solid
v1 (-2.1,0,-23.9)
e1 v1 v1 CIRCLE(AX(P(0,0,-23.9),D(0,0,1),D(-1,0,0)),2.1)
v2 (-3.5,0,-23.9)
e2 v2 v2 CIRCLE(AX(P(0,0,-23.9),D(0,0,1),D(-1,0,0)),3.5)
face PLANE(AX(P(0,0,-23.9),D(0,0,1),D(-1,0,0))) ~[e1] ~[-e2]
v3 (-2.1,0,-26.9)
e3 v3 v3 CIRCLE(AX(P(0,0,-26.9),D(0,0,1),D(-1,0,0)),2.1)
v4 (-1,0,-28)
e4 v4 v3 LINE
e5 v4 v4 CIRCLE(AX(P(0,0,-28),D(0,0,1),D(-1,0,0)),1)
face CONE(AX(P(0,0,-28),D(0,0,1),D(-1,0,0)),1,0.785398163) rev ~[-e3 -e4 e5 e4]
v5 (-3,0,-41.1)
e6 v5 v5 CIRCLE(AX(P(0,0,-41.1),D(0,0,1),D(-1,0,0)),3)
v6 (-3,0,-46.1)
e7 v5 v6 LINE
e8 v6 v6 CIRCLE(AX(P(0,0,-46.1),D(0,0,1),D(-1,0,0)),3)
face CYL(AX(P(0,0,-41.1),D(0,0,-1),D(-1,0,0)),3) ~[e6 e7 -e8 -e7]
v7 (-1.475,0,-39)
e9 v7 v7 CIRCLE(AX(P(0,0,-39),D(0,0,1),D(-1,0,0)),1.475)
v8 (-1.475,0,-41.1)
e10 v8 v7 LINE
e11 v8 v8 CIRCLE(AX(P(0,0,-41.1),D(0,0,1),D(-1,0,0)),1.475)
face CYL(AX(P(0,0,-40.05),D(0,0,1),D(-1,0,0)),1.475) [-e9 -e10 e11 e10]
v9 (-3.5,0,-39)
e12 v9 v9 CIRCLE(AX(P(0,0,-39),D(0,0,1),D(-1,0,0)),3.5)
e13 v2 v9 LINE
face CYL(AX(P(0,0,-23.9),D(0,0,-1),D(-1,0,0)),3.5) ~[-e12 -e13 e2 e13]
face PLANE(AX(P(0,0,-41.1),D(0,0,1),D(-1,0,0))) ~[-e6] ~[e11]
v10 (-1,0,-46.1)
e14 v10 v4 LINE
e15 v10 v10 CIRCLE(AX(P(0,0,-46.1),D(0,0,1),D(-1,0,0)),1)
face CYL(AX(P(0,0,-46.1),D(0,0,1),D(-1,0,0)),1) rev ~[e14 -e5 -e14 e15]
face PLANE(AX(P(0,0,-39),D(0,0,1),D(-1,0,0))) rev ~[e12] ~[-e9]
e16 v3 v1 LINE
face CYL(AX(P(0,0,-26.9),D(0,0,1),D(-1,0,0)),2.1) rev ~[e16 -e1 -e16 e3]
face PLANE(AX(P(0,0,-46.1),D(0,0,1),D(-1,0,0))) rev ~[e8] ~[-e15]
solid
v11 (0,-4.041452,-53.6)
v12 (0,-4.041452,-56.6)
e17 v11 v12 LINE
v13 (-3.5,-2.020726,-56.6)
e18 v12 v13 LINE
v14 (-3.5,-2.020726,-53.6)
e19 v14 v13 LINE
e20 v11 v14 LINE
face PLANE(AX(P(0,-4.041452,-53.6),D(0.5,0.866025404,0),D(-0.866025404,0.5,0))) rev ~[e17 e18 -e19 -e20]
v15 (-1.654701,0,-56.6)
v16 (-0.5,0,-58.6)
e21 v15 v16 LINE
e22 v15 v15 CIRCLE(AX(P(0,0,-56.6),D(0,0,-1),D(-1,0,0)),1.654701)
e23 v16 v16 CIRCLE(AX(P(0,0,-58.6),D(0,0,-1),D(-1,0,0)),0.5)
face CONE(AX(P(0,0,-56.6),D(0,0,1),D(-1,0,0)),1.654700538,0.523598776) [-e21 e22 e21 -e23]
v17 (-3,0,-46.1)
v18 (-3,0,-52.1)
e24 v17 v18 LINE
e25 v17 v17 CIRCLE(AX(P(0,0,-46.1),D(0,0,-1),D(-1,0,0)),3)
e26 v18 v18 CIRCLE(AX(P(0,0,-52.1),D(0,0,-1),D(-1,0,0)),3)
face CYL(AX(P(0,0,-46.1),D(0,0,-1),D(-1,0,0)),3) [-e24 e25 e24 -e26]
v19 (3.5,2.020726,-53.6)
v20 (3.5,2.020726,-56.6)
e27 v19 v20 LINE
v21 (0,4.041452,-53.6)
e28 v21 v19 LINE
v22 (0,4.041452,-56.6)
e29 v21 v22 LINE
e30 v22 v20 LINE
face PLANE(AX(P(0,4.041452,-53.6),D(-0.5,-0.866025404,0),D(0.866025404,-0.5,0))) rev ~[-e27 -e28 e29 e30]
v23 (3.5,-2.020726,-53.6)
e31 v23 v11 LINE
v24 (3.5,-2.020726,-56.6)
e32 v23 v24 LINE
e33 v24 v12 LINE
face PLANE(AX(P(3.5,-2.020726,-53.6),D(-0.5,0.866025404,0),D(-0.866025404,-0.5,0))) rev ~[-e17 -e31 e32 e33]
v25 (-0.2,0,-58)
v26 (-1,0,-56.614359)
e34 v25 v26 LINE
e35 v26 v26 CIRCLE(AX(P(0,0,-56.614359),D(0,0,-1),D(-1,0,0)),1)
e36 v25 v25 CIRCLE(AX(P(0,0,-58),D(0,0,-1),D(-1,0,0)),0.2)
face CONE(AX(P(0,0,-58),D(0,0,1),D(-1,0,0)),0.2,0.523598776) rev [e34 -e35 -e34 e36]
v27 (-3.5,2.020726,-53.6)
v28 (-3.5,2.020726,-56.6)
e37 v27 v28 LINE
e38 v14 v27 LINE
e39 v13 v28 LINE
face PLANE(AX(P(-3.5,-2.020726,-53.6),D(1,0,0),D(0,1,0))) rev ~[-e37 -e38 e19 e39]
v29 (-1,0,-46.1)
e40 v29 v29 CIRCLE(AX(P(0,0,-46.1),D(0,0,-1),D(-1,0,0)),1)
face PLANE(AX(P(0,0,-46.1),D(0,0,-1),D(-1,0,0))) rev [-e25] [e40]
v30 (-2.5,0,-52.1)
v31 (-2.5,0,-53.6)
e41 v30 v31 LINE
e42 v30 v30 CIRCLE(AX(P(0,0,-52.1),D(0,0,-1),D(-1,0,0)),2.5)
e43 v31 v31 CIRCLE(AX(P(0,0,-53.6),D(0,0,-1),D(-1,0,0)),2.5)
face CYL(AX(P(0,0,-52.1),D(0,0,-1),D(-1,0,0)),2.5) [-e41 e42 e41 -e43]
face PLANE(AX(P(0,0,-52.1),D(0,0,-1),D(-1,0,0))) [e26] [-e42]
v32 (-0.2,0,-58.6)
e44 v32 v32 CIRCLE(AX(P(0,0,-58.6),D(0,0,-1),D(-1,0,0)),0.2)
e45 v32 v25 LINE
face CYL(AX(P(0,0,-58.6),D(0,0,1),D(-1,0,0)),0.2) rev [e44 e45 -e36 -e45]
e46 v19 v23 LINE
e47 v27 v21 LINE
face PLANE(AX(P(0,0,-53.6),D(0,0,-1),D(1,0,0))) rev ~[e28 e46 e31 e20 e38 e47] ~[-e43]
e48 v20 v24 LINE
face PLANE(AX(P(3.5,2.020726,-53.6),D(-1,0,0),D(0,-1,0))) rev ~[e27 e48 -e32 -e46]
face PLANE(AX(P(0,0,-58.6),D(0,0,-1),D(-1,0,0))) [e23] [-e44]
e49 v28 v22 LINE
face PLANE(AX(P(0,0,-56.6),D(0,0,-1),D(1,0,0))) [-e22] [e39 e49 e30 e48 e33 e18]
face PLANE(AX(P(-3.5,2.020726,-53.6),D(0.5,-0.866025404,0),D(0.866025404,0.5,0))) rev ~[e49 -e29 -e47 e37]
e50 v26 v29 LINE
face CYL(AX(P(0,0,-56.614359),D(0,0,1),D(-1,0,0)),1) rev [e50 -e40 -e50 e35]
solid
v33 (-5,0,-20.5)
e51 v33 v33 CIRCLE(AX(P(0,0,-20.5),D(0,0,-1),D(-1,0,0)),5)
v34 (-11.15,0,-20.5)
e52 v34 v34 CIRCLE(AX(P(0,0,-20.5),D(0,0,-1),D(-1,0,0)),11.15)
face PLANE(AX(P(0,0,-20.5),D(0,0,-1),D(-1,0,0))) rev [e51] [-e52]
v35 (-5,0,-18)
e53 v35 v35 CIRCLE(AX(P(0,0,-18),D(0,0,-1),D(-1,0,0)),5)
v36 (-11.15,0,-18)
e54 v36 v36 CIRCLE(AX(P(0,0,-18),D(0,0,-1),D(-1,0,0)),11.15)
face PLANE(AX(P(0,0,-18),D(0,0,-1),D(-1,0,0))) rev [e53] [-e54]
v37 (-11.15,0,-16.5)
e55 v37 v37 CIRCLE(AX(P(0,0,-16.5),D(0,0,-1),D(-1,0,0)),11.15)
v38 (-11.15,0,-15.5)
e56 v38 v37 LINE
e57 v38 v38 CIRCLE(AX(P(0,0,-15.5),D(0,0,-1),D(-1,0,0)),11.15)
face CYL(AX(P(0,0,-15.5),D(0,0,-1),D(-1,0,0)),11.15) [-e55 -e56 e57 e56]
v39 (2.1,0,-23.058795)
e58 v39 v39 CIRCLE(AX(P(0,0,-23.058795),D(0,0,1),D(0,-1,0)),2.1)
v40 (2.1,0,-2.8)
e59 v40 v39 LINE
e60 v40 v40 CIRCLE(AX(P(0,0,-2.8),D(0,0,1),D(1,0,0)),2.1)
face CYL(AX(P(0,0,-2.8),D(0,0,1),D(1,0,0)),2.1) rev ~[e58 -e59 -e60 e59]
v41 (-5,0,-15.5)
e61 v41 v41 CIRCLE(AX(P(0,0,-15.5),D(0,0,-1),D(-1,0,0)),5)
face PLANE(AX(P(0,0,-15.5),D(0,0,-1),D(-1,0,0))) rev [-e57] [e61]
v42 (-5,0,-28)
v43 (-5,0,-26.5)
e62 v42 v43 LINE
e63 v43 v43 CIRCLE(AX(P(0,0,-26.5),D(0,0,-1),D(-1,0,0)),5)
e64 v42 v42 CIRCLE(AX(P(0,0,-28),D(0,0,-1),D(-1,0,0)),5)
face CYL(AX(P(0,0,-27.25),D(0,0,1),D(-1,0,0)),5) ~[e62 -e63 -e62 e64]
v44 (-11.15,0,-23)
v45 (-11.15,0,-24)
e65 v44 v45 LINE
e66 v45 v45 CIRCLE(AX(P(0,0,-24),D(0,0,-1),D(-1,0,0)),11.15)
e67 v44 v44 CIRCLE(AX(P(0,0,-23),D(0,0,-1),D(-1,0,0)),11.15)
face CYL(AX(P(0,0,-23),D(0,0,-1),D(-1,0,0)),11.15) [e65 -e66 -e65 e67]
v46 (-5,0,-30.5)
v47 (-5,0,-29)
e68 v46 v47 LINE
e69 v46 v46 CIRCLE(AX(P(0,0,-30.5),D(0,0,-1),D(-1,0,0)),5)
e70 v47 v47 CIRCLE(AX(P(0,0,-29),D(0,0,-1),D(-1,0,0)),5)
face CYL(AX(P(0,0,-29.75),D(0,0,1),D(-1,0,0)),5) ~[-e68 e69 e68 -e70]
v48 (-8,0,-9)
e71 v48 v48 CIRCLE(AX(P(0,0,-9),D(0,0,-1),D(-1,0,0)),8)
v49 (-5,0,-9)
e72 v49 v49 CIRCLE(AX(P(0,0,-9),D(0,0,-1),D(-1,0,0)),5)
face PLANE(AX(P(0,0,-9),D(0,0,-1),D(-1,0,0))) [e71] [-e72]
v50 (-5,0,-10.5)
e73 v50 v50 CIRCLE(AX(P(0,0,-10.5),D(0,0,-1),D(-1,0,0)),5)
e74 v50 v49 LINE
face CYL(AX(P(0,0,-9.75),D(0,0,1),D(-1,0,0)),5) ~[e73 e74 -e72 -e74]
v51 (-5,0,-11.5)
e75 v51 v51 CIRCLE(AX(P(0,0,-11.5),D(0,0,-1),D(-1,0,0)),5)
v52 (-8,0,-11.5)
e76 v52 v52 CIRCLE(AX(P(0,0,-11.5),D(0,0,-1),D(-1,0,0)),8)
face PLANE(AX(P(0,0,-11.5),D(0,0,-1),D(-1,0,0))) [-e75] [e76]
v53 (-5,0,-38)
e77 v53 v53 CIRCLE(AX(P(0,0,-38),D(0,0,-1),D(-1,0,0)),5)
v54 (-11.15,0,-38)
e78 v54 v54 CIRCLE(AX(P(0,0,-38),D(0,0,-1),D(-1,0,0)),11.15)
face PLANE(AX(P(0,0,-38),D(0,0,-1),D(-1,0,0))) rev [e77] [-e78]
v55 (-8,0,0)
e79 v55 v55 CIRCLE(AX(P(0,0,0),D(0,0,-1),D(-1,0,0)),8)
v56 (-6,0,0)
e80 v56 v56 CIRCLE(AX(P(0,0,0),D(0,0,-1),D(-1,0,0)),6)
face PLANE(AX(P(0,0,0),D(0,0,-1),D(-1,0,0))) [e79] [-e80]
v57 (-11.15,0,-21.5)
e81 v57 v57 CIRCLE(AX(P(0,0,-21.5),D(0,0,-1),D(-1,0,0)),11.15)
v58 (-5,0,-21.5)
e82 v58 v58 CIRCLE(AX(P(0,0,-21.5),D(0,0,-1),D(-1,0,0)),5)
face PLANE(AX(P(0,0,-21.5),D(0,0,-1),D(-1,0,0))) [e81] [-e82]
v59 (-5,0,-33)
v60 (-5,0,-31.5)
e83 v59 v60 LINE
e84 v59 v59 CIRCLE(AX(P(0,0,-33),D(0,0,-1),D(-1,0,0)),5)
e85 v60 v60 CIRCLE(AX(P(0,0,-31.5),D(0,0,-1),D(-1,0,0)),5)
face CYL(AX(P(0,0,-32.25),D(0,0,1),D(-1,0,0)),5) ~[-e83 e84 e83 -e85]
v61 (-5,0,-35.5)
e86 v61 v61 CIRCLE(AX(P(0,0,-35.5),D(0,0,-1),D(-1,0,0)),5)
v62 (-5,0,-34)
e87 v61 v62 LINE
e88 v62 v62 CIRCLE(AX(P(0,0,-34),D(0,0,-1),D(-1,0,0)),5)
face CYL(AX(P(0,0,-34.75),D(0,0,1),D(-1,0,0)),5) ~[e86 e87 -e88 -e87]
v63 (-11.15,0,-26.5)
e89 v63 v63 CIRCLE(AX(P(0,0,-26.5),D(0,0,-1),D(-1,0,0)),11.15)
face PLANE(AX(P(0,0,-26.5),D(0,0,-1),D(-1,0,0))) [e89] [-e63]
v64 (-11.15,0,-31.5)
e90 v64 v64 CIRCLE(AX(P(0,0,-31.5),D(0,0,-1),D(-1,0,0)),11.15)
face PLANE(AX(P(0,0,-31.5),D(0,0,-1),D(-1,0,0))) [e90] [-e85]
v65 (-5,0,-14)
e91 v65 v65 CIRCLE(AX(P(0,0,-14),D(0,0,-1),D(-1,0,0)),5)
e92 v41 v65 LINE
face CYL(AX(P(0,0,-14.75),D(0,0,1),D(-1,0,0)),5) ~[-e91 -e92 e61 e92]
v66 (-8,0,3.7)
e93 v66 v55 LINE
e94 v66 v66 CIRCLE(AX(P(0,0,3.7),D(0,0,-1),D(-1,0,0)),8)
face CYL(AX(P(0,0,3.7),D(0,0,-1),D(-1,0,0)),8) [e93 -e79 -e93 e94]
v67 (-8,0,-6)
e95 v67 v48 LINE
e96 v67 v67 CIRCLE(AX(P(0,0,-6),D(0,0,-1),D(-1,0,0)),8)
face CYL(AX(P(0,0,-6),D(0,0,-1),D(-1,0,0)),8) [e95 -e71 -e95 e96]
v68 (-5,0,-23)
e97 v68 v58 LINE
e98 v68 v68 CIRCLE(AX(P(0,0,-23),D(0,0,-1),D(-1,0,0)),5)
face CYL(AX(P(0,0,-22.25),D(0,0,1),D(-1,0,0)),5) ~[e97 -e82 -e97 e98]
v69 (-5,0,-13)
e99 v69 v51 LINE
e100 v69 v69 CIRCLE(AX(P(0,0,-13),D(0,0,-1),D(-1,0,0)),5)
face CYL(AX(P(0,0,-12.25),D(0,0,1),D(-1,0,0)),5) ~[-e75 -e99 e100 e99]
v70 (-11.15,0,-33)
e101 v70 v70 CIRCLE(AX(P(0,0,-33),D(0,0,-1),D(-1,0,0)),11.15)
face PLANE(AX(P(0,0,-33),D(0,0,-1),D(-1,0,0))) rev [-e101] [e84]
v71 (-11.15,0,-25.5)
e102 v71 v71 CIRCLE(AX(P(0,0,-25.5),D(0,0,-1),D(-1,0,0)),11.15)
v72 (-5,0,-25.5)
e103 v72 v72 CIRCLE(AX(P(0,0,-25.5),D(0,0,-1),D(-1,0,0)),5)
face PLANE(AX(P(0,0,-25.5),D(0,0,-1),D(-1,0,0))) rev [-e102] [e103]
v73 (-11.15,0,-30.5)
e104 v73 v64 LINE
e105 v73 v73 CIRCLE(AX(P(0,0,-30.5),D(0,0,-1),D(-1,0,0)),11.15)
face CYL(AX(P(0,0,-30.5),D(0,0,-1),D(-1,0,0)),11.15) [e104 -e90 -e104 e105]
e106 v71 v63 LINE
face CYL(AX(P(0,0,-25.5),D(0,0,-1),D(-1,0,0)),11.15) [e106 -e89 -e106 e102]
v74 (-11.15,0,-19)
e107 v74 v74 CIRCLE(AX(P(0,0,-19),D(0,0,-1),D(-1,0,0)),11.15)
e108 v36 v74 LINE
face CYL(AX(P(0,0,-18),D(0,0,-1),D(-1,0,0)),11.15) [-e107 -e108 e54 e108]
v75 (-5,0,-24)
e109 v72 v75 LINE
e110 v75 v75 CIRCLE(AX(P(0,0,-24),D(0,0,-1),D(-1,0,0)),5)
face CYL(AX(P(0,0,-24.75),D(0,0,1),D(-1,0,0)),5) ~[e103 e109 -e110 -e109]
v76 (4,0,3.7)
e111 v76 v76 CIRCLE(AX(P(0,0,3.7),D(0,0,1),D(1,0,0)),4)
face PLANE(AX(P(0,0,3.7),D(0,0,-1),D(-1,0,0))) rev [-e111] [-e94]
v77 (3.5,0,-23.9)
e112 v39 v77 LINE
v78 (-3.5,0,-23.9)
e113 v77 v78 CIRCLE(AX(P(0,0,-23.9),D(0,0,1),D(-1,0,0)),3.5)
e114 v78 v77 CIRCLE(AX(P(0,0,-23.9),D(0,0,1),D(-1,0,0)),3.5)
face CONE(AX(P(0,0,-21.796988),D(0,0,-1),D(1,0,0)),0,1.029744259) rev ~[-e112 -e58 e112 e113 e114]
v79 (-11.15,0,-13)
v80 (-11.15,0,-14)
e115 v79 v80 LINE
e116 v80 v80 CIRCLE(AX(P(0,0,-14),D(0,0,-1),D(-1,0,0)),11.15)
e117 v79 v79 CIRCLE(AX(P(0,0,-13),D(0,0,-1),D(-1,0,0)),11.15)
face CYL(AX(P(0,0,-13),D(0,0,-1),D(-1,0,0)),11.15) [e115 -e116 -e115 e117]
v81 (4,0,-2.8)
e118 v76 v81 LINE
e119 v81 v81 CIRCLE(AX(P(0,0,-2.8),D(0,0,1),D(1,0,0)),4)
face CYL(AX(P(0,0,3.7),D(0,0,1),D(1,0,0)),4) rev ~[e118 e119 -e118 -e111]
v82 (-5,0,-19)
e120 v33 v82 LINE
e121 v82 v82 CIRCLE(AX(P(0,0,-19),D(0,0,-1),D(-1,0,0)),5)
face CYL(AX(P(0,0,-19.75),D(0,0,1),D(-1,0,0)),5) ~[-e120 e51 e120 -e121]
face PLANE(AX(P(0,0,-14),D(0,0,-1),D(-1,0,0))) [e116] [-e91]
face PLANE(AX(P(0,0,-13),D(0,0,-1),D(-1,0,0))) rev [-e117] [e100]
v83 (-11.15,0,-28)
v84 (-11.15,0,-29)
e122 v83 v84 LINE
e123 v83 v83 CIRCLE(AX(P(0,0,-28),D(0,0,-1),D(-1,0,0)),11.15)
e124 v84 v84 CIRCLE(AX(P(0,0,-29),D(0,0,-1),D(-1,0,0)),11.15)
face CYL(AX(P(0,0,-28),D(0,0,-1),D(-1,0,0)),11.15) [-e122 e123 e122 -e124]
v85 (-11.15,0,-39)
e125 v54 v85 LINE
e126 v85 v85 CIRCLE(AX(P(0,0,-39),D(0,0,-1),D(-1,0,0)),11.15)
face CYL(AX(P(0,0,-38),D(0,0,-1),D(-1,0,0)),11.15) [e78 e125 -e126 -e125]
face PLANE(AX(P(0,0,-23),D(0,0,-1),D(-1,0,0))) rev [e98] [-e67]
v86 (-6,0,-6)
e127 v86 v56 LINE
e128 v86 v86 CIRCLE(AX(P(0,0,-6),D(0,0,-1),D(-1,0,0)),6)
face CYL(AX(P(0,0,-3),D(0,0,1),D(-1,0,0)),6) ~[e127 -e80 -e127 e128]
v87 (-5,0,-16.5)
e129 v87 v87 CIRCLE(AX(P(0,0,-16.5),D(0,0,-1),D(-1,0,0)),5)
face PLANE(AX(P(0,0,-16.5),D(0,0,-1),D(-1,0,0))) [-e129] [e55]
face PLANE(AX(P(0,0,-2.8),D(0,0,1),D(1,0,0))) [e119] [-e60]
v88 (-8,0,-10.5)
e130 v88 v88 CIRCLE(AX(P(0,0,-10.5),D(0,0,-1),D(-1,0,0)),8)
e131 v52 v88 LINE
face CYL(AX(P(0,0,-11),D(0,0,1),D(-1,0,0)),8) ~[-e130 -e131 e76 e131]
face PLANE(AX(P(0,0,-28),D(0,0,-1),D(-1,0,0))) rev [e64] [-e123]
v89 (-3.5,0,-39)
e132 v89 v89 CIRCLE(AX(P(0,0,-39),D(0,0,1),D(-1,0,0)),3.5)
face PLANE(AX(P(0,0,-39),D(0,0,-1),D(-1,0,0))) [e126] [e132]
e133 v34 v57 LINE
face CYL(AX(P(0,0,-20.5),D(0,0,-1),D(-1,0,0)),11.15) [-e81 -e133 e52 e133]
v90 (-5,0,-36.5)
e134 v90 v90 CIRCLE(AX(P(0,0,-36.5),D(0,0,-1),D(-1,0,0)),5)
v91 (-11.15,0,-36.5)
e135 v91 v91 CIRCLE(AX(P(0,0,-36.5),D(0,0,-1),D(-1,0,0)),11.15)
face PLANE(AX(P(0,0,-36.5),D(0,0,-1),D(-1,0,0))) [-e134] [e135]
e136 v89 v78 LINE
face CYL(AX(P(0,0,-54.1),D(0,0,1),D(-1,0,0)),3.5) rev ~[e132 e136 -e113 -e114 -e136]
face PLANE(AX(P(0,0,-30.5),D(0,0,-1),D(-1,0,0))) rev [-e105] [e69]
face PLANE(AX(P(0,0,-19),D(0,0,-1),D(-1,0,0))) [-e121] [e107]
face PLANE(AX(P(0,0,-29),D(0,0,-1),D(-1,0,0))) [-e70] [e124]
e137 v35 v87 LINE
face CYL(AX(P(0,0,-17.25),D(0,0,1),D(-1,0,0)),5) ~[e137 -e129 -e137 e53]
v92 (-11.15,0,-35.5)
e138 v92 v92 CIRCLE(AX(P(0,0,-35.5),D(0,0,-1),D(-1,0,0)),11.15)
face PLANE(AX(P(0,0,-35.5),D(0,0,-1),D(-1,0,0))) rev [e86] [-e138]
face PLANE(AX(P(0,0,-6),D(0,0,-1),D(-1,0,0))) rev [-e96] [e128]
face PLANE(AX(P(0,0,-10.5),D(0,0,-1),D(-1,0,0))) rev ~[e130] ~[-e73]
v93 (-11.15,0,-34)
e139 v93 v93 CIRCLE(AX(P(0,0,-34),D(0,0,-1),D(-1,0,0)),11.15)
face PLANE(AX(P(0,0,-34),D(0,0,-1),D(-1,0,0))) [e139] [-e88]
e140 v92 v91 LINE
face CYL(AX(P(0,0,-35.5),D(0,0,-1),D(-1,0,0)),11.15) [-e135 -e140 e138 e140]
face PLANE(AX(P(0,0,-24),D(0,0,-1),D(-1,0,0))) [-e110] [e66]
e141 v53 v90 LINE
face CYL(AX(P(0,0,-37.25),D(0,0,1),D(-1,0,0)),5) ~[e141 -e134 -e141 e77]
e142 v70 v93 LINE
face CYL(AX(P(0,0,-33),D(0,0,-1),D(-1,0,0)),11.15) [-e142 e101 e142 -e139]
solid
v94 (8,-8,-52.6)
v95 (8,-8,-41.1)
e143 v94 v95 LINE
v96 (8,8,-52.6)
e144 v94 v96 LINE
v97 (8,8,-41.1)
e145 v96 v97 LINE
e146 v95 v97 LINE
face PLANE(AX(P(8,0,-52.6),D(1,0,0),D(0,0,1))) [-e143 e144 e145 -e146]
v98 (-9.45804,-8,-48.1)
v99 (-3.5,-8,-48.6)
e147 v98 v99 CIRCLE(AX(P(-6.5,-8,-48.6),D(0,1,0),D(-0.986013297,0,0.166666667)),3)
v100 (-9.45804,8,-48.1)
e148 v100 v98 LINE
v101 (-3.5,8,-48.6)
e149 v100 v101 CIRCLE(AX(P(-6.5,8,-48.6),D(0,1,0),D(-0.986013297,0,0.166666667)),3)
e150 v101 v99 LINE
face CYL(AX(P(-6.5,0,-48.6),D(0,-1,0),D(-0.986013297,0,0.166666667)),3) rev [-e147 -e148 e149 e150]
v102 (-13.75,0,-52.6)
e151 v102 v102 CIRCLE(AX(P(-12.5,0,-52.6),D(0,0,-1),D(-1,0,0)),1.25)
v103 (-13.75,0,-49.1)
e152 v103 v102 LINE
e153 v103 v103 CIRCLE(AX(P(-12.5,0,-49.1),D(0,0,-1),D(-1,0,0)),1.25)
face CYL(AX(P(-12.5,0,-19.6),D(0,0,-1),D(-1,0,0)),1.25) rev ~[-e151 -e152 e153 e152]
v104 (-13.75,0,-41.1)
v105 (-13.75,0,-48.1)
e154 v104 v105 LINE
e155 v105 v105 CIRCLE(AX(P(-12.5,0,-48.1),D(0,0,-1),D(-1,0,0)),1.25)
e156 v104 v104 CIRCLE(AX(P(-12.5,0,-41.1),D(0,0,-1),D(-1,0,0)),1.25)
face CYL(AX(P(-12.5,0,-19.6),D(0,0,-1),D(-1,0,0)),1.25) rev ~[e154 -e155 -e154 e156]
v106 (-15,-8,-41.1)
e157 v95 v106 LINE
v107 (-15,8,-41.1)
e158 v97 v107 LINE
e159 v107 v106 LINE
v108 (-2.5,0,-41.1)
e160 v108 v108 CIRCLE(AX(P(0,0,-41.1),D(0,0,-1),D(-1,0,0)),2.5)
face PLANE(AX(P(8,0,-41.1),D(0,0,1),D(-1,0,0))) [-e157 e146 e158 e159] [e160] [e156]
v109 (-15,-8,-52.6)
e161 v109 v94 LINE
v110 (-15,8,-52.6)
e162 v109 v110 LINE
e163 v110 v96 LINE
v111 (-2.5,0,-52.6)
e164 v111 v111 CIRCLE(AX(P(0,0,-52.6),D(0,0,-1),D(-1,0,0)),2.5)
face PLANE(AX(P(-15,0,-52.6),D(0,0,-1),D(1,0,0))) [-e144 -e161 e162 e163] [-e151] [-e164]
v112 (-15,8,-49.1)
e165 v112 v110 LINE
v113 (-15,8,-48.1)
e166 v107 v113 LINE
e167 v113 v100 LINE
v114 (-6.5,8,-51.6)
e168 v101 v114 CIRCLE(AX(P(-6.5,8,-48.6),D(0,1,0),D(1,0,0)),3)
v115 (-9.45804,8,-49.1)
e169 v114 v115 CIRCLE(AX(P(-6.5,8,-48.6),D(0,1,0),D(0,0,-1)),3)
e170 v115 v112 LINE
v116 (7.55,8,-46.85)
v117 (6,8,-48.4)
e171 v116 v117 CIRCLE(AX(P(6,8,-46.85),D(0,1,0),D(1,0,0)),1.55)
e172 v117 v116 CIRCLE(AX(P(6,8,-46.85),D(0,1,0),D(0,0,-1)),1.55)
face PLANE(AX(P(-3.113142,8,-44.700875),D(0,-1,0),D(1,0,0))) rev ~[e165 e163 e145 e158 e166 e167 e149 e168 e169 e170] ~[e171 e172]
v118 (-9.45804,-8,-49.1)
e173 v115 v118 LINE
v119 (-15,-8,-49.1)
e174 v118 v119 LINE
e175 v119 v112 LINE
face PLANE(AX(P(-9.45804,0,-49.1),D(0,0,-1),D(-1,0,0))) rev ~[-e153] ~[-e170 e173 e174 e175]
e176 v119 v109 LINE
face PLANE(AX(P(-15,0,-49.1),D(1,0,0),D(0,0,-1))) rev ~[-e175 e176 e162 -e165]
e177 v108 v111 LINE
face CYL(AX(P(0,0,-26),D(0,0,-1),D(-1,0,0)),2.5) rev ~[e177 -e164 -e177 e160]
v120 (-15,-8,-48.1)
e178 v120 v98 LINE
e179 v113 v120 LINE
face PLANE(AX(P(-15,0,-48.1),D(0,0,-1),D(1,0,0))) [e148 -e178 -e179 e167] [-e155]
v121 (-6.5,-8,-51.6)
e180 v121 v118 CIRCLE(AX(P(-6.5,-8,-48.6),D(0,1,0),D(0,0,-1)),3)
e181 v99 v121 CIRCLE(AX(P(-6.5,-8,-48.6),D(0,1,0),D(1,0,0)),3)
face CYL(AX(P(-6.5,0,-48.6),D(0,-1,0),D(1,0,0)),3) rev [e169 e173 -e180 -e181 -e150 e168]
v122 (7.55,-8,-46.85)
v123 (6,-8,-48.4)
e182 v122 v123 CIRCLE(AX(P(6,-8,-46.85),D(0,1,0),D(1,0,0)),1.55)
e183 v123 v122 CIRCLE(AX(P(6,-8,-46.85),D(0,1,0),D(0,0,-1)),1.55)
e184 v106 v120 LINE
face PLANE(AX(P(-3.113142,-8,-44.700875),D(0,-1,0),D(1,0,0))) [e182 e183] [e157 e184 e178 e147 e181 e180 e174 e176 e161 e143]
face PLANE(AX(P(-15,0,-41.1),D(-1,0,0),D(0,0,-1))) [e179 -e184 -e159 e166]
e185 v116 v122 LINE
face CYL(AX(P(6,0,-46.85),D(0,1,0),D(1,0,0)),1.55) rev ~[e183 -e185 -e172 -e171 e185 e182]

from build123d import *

# Parameters (mm, degrees)
F0_W      = 6
F0_H      = 6
F0_W_2    = 5
F0_H_2    = 1.5
F0_W_3    = 3
F0_H_3    = 1
F2_R      = 4
F3_DEPTH  = 6.5
F4_R      = 2.1
F5_DEPTH  = 50
F7_D      = 7
F7_DEPTH  = 15.1
F7_TIP    = 2.1030121666
F8_W      = 0.475
F8_H      = 2.1
F10_W     = 2
F10_H     = 4
F11_DEPTH = 8
F13_D     = 5
F13_DEPTH = 15.1
F13_TIP   = 1.5021515476
F15_D     = 2.5
F15_DEPTH = 21.5
F15_TIP   = 0.7510757738
F18_R     = 2.5
F18_R_2   = 2
F19_DEPTH = 3


with BuildPart() as f1:
    # F0 (on Front) → F1 (revolve)
    with BuildSketch(Plane.XZ):
        Polygon((-6, 0), (0, 0), (0, 3.7), (-8, 3.7), (-8, 0), align=None)
        with Locations((-3, -3)):
            Rectangle(F0_W, F0_H)
        Polygon((0, -14), (0, -13), (-5, -13), (-11.15, -13), (-11.15, -14), (-5, -14), align=None)
        with Locations((-2.5, -29.75)):
            Rectangle(F0_W_2, F0_H_2)
        with Locations((-2.5, -27.25)):
            Rectangle(F0_W_2, F0_H_2)
        Polygon((0, -39), (0, -38), (-5, -38), (-11.15, -38), (-11.15, -39), align=None)
        with Locations((-2.5, -9.75)):
            Rectangle(F0_W_2, F0_H_2)
        with Locations((-2.5, -32.25)):
            Rectangle(F0_W_2, F0_H_2)
        with Locations((-2.5, -19.75)):
            Rectangle(F0_W_2, F0_H_2)
        with Locations((-2.5, -22.25)):
            Rectangle(F0_W_2, F0_H_2)
        Polygon((0, -24), (0, -23), (-5, -23), (-11.15, -23), (-11.15, -24), (-5, -24), align=None)
        with Locations((-2.5, -17.25)):
            Rectangle(F0_W_2, F0_H_2)
        Polygon((0, -34), (0, -33), (-5, -33), (-11.15, -33), (-11.15, -34), (-5, -34), align=None)
        with Locations((-2.5, -24.75)):
            Rectangle(F0_W_2, F0_H_2)
        with Locations((-2.5, -34.75)):
            Rectangle(F0_W_2, F0_H_2)
        Polygon((0, -9), (0, -6), (-6, -6), (-8, -6), (-8, -9), (-5, -9), align=None)
        Polygon((0, -36.5), (0, -35.5), (-5, -35.5), (-11.15, -35.5), (-11.15, -36.5), (-5, -36.5), align=None)
        with Locations((-6.5, -11)):
            Rectangle(F0_W_3, F0_H_3)
        with Locations((-2.5, -14.75)):
            Rectangle(F0_W_2, F0_H_2)
        with Locations((-2.5, -12.25)):
            Rectangle(F0_W_2, F0_H_2)
        Polygon((0, -29), (0, -28), (-5, -28), (-11.15, -28), (-11.15, -29), (-5, -29), align=None)
        Polygon((0, -31.5), (0, -30.5), (-5, -30.5), (-11.15, -30.5), (-11.15, -31.5), (-5, -31.5), align=None)
        with Locations((-2.5, -11)):
            Rectangle(F0_W_2, F0_H_3)
        with Locations((-2.5, -37.25)):
            Rectangle(F0_W_2, F0_H_2)
        Polygon((0, -26.5), (0, -25.5), (-5, -25.5), (-11.15, -25.5), (-11.15, -26.5), (-5, -26.5), align=None)
        Polygon((0, -21.5), (0, -20.5), (-5, -20.5), (-11.15, -20.5), (-11.15, -21.5), (-5, -21.5), align=None)
        Polygon((0, -19), (0, -18), (-5, -18), (-11.15, -18), (-11.15, -19), (-5, -19), align=None)
        Polygon((0, -16.5), (0, -15.5), (-5, -15.5), (-11.15, -15.5), (-11.15, -16.5), (-5, -16.5), align=None)
    revolve(axis=Axis((0, 0, -3), (0, 0, -1)))

    # F2 (on face) → F3 (cut)
    with BuildSketch(Plane.XY.offset(3.7)):
        Circle(F2_R)
    extrude(amount=-F3_DEPTH, mode=Mode.SUBTRACT)

    # F4 (on face) → F5 (cut)
    with BuildSketch(Plane.XY.offset(-2.8)):
        Circle(F4_R)
    extrude(amount=-F5_DEPTH, mode=Mode.SUBTRACT)

    # F7
    with Locations(Plane(origin=(0, 0, -39), x_dir=(1, 0, 0), z_dir=(0, 0, -1))):
        with Locations((0, 0)):
            Hole(F7_D / 2, depth=F7_DEPTH)
            with Locations((0, 0, -(F7_DEPTH + F7_TIP / 2))):  # 118° drill point
                Cone(0, F7_D / 2, F7_TIP, mode=Mode.SUBTRACT)


with BuildPart() as f9:
    # F8 (on Front) → F9 (revolve)
    with BuildSketch(Plane.XZ):
        Polygon((-2.1, -26.9), (-2.1, -23.9), (-3.5, -23.9), (-3.5, -39), (-1.475, -39), (-1, -39), (-1, -28), align=None)
        with Locations((-1.2375, -40.05)):
            Rectangle(F8_W, F8_H)
        Polygon((-1, -46.1), (-1, -41.1), (-1.475, -41.1), (-3, -41.1), (-3, -46.1), align=None)
    revolve(axis=Axis((0, 0, -31.5), (0, 0, 1)))


with BuildPart() as f11:
    # F10 (on Front) → F11 (new body, symmetric)
    with BuildSketch(Plane.XZ):
        with BuildLine():
            Line((8, -41.1), (0, -41.1))
            Line((0, -41.1), (-15, -41.1))
            Line((-15, -41.1), (-15, -48.1))
            Line((-15, -48.1), (-9.4580398915, -48.1))
            ThreePointArc((-9.4580398915, -48.1), (-6.2491212192, -45.6105084316), (-3.5, -48.6))
            Line((-3.5, -48.6), (6, -48.6))
            Line((6, -48.6), (6, -48.4))
            ThreePointArc((6, -48.4), (4.9039844892, -45.7539844892), (7.55, -46.85))
            Line((7.55, -46.85), (8, -46.85))
            Line((8, -46.85), (8, -41.1))
        make_face()
        with BuildLine():
            Line((6, -52.6), (6, -48.6))
            Line((6, -48.6), (-3.5, -48.6))
            ThreePointArc((-3.5, -48.6), (-4.3786796564, -50.7213203436), (-6.5, -51.6))
            Line((-6.5, -51.6), (-6.5, -52.6))
            Line((-6.5, -52.6), (6, -52.6))
        make_face()
        with BuildLine():
            Line((-9.4580398915, -49.1), (-15, -49.1))
            Line((-15, -49.1), (-15, -52.6))
            Line((-15, -52.6), (-6.5, -52.6))
            Line((-6.5, -52.6), (-6.5, -51.6))
            ThreePointArc((-6.5, -51.6), (-8.4364916731, -50.8912878475), (-9.4580398915, -49.1))
        make_face()
        with Locations((7, -50.6)):
            Rectangle(F10_W, F10_H)
        with BuildLine():
            Line((8, -48.6), (8, -46.85))
            Line((8, -46.85), (7.55, -46.85))
            ThreePointArc((7.55, -46.85), (7.0960155108, -47.9460155108), (6, -48.4))
            Line((6, -48.4), (6, -48.6))
            Line((6, -48.6), (8, -48.6))
        make_face()
    extrude(amount=F11_DEPTH, both=True)

    # F13
    with Locations(Plane.XY.offset(-41.1)):
        with Locations((0, 0)):
            Hole(F13_D / 2, depth=F13_DEPTH)
            with Locations((0, 0, -(F13_DEPTH + F13_TIP / 2))):  # 118° drill point
                Cone(0, F13_D / 2, F13_TIP, mode=Mode.SUBTRACT)

    # F15
    with Locations(Plane.XY.offset(-41.1)):
        with Locations((-12.5, 0)):
            Hole(F15_D / 2, depth=F15_DEPTH)
            with Locations((0, 0, -(F15_DEPTH + F15_TIP / 2))):  # 118° drill point
                Cone(0, F15_D / 2, F15_TIP, mode=Mode.SUBTRACT)


with BuildPart() as f17:
    # F16 (on Front) → F17 (revolve)
    with BuildSketch(Plane.XZ):
        Polygon((-1, -52.1), (-1, -46.1), (-3, -46.1), (-3, -52.1), (-2.5, -52.1), align=None)
        Polygon((-1, -53.6), (-1, -52.1), (-2.5, -52.1), (-2.5, -53.6), (-2, -53.6), align=None)
        Polygon((-1, -56.6), (-1, -53.6), (-2, -53.6), (-2, -56.6), (-1.6547005384, -56.6), align=None)
        Polygon((-1, -56.6143593539), (-1, -56.6), (-1.6547005384, -56.6), (-0.5, -58.6), (-0.2, -58.6), (-0.2, -58), align=None)
    revolve(axis=Axis((0, 0, -52.35), (0, 0, -1)))

    # F18 (on face) → F19 (join)
    with BuildSketch(Plane(origin=(0, 0, -53.6), x_dir=(1, 0, 0), z_dir=(0, 0, -1))):
        Polygon((3.5, -2.0207259422), (3.5, 2.0207259422), (0, 4.0414518843), (-3.5, 2.0207259422), (-3.5, -2.0207259422), (0, -4.0414518843), align=None)
        Circle(F18_R, mode=Mode.SUBTRACT)
        Circle(F18_R)
        Circle(F18_R_2, mode=Mode.SUBTRACT)
    extrude(amount=F19_DEPTH)


solid = Compound([f1.part, f9.part, f11.part, f17.part])
